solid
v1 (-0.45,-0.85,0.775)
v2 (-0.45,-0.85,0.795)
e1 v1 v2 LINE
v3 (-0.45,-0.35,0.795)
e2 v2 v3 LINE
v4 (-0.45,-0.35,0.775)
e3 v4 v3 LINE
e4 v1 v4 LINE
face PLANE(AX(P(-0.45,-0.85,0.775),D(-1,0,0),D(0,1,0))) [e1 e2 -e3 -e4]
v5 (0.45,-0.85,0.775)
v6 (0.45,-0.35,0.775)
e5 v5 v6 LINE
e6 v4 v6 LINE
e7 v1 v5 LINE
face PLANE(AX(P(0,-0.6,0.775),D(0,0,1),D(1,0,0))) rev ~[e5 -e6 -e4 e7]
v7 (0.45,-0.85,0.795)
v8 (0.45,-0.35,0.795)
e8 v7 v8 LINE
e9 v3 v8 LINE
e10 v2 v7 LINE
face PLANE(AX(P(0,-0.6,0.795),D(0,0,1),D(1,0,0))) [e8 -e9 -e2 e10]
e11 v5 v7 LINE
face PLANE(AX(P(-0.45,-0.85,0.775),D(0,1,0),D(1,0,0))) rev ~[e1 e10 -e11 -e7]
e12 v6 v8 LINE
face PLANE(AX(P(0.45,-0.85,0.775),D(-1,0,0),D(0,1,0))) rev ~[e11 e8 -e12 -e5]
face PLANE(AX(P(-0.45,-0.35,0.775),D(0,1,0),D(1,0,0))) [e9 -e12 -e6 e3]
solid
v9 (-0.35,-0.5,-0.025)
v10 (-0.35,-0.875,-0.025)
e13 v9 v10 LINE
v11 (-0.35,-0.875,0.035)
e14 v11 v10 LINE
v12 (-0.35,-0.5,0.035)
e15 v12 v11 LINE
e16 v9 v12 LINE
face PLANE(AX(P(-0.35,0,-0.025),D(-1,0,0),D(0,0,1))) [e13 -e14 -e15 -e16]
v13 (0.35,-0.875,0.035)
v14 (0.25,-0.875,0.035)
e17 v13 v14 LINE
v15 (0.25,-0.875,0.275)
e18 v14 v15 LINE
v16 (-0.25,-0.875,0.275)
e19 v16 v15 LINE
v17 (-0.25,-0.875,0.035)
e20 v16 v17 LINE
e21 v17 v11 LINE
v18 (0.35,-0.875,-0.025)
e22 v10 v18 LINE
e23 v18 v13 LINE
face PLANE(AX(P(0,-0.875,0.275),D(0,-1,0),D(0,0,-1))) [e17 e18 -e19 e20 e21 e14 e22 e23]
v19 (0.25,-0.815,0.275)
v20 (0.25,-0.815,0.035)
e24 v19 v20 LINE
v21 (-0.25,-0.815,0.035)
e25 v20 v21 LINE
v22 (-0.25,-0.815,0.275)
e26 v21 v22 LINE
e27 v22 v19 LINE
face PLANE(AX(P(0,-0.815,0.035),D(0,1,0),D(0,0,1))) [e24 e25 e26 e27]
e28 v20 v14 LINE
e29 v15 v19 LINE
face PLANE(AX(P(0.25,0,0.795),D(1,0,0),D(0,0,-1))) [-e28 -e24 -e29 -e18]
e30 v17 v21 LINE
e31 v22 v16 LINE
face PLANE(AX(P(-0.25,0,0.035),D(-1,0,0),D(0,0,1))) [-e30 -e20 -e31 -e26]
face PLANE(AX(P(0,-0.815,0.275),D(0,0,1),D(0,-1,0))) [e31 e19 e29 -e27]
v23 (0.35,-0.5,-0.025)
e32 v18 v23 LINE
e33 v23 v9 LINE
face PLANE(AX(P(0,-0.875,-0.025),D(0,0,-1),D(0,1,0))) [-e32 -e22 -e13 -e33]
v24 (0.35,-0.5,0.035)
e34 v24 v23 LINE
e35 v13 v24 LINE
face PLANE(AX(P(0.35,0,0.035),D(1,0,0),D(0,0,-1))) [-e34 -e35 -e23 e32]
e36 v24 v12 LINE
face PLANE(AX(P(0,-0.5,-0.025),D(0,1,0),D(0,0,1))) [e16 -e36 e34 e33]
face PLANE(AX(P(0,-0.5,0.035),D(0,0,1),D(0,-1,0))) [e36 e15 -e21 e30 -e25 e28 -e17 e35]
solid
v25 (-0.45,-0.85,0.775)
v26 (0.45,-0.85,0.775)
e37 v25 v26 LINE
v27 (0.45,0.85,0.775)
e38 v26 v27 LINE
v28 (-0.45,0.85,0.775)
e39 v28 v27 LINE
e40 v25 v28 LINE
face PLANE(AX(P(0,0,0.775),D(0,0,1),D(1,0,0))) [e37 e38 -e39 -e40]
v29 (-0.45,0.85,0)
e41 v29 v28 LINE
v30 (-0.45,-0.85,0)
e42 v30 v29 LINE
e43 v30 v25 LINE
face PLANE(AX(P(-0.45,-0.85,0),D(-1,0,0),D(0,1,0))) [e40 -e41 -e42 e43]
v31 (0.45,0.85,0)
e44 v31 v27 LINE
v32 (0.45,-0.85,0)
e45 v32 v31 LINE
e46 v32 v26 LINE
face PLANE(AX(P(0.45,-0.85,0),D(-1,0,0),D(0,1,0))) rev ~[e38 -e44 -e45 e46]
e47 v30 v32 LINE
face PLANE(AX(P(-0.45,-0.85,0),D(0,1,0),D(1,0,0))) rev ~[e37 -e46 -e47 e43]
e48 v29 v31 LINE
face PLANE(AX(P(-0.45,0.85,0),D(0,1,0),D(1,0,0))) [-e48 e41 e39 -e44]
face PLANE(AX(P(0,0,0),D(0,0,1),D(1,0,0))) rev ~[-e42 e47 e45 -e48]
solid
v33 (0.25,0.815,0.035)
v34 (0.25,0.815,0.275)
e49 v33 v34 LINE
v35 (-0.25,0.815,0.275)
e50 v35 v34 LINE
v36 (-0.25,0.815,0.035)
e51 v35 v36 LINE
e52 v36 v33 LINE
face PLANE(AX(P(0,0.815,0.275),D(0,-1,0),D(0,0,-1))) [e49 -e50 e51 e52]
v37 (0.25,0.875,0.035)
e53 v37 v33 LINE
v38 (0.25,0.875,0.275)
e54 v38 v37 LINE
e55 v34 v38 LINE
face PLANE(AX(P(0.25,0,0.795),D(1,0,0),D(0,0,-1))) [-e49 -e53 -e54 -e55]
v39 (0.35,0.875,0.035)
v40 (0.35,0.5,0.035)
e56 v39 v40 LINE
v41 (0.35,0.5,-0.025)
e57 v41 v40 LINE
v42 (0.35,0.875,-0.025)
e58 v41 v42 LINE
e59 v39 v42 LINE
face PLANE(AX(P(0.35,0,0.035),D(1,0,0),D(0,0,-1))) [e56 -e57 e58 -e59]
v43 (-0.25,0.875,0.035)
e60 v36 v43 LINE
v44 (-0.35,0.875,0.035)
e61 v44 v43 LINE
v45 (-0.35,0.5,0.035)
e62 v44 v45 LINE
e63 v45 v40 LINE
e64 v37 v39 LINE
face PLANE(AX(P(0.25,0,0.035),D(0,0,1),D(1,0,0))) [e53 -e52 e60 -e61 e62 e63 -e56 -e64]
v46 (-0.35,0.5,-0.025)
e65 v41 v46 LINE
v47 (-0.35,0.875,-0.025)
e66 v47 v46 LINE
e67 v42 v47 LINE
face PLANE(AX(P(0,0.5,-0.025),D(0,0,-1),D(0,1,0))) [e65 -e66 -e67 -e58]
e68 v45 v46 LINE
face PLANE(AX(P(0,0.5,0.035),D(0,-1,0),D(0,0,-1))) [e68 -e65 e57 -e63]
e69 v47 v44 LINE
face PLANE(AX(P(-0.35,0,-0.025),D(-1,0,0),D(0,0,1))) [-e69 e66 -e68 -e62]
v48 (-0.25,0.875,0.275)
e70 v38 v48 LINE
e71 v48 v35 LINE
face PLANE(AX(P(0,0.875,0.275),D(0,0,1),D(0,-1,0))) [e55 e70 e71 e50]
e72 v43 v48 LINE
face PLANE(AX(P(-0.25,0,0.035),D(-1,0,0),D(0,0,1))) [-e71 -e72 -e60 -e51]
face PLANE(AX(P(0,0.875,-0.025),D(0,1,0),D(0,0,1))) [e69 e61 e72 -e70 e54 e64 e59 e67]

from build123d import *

# Parameters (mm, degrees)
F0_W          = 0.9
F0_H          = 1.7
F1_DEPTH      = 0.775
F2_W          = 0.9
F2_H          = 0.5
F3_DEPTH      = 0.02
F5_DEPTH      = 0.46
F7_DEPTH      = 0.876
F7_DEPTH_BACK = 0.876


with BuildPart() as f1:
    # F0 (on Top) → F1 (new body)
    with BuildSketch(Plane.XY):
        Rectangle(F0_W, F0_H)
    extrude(amount=F1_DEPTH)


with BuildPart() as f3:
    # F2 (on face) → F3 (new body)
    with BuildSketch(Plane.XY.offset(0.775)):
        with Locations((0, -0.6)):
            Rectangle(F2_W, F2_H)
    extrude(amount=F3_DEPTH)


with BuildPart() as f5:
    # F4 (on Right) → F5 (new body, symmetric)
    with BuildSketch(Plane.YZ):
        Polygon((-0.815, 0.035), (-0.815, 0.275), (-0.875, 0.275), (-0.875, -0.025), (-0.5, -0.025), (-0.5, 0.035), align=None)
    extrude(amount=F5_DEPTH, both=True)


with BuildPart() as f5b:
    # F4 (on Right) → F5, piece 2 (new body, symmetric)
    with BuildSketch(Plane.YZ):
        Polygon((0.875, 0.275), (0.815, 0.275), (0.815, 0.035), (0.5, 0.035), (0.5, -0.025), (0.875, -0.025), align=None)
    extrude(amount=F5_DEPTH, both=True)


with BuildPart() as f7_tool:
    # F6 (on Front) → F7 (new body, two sides)
    with BuildSketch(Plane.XZ) as f7_sk:
        Polygon((-0.25, 0.795), (-0.5751563585, 0.795), (-0.5751563585, -0.025), (-0.35, -0.025), (-0.35, 0.035), (-0.25, 0.035), align=None)
        Polygon((0.5751563585, -0.025), (0.5751563585, 0.795), (0.25, 0.795), (0.25, 0.035), (0.35, 0.035), (0.35, -0.025), align=None)
    extrude(amount=-F7_DEPTH)
    extrude(f7_sk.sketch, amount=F7_DEPTH_BACK)


with BuildPart() as f5_1:
    add(f5.part)

    # F7: cut by f7_tool
    add(f7_tool.part, mode=Mode.SUBTRACT)


with BuildPart() as f5b_1:
    add(f5b.part)

    # F7: cut by f7_tool
    add(f7_tool.part, mode=Mode.SUBTRACT)


solid = Compound([f1.part, f3.part, f5_1.part, f5b_1.part])
